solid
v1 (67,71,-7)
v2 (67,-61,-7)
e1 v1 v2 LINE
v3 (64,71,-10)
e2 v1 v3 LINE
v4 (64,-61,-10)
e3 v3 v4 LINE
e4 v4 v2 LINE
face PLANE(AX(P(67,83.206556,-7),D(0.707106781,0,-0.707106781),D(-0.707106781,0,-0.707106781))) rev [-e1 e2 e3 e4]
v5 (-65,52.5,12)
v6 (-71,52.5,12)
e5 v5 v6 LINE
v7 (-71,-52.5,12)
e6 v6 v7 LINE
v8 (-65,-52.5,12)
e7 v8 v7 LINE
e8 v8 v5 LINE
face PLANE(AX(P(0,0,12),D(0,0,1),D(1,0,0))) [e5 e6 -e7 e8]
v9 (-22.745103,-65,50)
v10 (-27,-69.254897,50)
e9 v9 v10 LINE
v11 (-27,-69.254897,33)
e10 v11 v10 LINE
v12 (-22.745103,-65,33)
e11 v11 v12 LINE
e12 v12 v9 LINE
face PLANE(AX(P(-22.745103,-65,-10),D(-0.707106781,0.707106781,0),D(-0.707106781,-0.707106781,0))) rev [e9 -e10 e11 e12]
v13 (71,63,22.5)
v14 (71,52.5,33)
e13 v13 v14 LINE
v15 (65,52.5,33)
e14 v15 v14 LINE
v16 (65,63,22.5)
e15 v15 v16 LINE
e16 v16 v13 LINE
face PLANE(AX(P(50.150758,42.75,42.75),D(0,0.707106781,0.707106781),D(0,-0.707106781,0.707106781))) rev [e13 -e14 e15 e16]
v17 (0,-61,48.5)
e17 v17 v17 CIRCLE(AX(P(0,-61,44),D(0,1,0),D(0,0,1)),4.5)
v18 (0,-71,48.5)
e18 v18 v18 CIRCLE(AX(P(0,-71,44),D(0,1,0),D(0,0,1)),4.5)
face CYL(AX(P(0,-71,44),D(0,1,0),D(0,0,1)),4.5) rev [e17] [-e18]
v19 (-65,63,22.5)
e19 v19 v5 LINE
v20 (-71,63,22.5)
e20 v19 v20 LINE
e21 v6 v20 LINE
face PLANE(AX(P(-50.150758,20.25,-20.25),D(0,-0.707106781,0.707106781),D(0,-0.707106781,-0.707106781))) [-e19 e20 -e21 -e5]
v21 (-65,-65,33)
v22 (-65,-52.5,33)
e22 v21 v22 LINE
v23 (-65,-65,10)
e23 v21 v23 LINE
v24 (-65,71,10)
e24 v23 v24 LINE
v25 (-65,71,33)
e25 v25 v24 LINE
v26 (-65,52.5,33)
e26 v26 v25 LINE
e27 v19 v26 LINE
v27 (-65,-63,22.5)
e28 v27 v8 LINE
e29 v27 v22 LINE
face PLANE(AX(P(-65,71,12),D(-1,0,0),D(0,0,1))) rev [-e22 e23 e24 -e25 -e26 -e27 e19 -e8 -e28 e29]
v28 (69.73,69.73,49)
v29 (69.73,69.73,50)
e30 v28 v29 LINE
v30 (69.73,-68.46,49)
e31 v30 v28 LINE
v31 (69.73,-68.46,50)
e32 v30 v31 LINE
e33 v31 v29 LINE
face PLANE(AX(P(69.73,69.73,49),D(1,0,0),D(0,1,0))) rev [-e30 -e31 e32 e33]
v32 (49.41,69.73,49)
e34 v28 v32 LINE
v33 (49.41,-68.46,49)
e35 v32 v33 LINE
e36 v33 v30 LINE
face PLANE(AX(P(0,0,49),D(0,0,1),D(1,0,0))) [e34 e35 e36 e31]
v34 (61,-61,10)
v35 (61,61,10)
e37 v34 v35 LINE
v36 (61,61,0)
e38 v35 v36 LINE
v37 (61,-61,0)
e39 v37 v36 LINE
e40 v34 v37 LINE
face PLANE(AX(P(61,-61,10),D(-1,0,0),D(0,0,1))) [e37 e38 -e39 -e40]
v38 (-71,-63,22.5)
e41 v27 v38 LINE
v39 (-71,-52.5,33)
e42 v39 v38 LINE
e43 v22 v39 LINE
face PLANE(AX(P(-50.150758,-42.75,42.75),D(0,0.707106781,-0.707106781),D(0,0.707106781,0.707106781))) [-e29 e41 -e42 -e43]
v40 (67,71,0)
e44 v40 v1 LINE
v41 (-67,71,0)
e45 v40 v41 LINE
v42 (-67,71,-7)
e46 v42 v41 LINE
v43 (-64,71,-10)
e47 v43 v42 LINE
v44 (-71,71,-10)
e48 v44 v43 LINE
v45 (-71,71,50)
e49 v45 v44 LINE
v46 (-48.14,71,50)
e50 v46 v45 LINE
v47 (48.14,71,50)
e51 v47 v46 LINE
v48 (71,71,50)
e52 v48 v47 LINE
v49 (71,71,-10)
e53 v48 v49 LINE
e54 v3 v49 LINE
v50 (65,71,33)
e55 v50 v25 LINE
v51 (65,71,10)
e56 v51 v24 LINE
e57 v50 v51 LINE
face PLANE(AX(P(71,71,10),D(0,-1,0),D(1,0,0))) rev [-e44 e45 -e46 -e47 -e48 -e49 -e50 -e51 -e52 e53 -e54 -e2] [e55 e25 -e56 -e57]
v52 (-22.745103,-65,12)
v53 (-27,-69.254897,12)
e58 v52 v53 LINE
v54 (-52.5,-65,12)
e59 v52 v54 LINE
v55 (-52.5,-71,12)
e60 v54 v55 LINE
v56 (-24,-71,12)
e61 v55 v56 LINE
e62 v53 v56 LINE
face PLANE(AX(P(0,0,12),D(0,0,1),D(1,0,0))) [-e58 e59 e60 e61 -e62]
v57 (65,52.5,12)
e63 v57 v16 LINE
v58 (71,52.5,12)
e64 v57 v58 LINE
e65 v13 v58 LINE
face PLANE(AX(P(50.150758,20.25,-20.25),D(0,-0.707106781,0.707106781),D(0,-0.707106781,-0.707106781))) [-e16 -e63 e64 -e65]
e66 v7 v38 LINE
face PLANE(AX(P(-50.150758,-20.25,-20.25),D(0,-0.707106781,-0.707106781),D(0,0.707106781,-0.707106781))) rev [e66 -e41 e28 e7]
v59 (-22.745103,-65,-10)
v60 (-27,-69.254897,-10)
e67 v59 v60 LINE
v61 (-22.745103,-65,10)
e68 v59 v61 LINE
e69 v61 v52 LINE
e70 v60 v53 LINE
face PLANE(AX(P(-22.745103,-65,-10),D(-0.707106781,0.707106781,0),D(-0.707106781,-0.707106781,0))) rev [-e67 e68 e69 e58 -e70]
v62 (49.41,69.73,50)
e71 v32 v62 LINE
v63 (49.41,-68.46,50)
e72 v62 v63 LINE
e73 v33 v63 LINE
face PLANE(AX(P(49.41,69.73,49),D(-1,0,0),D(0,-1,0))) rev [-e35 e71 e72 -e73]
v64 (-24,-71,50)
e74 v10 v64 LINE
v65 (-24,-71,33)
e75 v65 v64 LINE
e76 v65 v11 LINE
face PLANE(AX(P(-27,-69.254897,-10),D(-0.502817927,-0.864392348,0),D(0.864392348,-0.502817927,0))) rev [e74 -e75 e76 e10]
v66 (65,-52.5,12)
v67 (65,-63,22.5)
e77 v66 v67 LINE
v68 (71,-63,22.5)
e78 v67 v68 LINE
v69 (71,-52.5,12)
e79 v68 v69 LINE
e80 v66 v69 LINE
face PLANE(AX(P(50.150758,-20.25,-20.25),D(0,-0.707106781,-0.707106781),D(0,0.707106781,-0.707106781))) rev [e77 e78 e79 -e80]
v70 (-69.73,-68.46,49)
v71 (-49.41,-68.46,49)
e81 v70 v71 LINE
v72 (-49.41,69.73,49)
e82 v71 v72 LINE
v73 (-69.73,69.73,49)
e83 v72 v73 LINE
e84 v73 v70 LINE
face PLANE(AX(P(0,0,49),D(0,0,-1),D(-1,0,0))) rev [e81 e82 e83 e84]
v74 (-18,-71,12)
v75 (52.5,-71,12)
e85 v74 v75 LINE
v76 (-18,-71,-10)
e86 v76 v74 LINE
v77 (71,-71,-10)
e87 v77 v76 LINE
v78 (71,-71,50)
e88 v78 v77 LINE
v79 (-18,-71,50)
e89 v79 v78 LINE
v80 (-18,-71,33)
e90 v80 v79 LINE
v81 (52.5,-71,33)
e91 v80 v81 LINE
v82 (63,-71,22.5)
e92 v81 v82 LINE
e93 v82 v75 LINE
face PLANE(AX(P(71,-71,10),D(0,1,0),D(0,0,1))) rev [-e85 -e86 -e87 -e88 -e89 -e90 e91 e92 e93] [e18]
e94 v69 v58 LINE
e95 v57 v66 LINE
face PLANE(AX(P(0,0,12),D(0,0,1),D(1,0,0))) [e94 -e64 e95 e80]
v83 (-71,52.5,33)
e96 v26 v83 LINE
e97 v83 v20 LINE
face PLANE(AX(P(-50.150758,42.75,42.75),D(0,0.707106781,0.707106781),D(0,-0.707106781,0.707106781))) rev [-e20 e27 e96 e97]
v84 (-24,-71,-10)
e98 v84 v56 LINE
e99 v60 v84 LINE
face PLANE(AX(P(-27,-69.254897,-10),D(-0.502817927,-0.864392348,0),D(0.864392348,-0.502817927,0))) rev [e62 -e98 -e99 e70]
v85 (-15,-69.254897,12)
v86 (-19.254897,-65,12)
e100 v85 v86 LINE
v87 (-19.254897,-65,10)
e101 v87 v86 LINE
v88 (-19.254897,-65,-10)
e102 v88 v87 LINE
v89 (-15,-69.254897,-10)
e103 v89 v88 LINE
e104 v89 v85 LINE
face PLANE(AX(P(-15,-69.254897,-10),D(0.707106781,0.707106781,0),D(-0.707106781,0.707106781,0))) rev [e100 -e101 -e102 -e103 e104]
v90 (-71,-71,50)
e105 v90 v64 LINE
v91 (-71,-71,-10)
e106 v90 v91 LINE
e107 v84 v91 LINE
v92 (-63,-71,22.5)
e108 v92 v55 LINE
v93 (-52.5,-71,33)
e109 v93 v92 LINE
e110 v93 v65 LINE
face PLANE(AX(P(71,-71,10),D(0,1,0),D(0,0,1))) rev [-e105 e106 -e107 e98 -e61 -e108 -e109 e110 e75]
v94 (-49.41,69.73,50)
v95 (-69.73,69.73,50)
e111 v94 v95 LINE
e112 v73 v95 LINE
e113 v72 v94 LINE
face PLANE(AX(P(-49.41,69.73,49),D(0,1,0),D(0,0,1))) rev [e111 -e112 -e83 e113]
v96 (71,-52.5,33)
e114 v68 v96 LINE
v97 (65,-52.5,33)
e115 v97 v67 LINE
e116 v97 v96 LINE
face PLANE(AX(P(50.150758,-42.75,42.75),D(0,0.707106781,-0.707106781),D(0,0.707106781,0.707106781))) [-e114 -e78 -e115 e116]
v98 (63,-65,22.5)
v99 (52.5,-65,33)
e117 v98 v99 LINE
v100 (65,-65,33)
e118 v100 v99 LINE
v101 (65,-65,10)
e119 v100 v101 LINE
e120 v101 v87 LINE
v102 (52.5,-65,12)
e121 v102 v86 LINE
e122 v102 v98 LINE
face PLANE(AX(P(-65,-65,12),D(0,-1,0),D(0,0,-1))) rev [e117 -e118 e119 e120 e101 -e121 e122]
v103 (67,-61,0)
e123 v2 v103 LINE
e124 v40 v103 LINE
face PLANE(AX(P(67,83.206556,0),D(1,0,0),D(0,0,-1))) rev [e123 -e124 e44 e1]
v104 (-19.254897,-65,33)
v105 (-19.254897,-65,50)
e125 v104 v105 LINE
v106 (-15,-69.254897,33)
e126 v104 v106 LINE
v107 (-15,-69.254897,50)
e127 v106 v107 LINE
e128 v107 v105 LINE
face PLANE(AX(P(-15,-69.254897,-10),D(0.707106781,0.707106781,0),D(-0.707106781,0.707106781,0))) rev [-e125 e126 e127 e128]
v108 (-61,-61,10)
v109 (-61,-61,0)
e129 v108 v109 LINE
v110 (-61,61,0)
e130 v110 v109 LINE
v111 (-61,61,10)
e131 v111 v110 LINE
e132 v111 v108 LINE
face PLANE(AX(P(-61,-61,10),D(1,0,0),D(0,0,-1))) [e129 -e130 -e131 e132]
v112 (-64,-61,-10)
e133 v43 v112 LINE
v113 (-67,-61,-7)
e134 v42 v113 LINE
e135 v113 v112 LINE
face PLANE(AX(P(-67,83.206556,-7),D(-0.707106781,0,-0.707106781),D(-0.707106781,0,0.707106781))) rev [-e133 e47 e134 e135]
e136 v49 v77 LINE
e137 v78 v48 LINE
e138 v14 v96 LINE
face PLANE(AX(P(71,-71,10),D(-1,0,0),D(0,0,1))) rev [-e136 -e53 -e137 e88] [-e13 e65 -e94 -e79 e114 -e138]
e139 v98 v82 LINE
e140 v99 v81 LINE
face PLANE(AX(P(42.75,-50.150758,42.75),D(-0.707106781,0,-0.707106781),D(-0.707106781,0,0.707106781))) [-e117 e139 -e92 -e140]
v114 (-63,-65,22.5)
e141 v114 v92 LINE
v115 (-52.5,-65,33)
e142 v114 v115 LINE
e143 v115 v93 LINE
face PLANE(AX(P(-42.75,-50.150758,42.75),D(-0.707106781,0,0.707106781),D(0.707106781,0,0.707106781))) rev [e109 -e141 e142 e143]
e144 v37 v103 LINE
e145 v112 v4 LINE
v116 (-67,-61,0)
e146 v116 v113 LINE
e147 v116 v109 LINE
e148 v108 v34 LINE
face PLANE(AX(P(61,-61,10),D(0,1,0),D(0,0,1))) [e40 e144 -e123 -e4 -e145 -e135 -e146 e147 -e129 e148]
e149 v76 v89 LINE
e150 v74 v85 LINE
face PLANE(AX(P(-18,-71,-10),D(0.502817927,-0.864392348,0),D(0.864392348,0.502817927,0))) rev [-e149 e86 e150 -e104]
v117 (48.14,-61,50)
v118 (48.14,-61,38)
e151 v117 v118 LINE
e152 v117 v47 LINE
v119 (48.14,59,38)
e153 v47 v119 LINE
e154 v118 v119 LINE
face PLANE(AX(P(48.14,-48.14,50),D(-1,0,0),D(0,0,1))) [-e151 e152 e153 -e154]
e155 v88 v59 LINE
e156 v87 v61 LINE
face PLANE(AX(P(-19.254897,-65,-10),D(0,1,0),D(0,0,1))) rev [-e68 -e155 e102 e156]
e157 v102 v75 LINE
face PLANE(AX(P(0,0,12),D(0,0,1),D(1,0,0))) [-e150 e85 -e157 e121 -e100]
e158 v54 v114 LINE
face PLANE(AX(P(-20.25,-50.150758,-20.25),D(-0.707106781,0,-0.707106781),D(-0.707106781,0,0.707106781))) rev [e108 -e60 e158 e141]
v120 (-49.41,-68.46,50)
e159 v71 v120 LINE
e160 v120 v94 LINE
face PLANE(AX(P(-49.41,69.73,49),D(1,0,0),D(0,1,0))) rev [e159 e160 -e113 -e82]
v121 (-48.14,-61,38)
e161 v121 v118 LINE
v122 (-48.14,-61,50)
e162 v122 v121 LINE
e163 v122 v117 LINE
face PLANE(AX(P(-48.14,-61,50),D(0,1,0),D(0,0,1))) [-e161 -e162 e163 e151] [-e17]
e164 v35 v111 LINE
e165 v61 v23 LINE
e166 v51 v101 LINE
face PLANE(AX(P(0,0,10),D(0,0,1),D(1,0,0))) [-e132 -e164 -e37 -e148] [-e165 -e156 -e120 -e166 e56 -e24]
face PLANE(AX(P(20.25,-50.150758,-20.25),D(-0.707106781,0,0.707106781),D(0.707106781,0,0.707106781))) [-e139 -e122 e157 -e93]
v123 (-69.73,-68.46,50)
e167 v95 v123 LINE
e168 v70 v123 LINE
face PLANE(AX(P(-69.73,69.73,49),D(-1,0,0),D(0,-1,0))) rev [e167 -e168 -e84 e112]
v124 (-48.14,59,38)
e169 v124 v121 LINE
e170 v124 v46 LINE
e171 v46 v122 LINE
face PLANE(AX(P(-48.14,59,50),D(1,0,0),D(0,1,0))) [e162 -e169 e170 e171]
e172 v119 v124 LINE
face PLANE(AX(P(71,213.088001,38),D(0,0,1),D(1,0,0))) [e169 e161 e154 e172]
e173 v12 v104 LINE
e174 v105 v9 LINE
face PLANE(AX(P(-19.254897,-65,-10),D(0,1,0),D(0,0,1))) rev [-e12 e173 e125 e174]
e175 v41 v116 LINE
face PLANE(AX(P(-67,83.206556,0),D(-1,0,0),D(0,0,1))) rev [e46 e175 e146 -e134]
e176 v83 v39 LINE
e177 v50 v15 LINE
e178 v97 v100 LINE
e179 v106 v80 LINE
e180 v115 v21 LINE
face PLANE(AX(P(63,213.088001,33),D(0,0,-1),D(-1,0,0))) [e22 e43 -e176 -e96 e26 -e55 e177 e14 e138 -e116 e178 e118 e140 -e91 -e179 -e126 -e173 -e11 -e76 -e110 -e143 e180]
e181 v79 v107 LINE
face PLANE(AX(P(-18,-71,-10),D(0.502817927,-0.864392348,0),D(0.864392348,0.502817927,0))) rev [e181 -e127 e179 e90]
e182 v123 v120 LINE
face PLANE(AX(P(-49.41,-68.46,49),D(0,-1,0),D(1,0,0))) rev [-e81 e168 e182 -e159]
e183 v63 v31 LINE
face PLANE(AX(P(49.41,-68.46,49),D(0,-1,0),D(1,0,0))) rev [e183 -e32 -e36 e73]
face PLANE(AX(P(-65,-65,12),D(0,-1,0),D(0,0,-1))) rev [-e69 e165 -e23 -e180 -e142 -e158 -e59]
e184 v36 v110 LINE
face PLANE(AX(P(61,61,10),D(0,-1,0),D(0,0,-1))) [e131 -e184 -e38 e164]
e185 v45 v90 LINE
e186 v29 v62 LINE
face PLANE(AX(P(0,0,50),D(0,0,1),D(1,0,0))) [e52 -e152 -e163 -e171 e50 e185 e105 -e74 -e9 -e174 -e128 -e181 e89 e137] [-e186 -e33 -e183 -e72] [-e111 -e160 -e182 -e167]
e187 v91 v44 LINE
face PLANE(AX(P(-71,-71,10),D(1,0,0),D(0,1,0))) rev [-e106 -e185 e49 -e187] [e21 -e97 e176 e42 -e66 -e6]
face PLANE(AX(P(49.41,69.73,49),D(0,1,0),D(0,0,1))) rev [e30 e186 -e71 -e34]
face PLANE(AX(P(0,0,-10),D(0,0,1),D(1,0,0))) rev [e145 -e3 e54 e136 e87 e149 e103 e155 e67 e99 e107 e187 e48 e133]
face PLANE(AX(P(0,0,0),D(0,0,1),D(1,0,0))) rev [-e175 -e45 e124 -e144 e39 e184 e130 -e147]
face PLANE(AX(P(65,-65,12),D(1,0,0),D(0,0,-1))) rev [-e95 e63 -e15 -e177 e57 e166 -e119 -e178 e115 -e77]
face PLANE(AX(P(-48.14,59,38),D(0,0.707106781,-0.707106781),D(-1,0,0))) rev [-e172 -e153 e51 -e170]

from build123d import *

# Parameters (mm, degrees)
SKETCH1_W            = 142
SKETCH1_H            = 142
SKETCH1_W_2          = 122
SKETCH1_H_2          = 122
BOSS_EXTRUDE1_DEPTH  = 10
SKETCH2_W            = 142
SKETCH2_H            = 10
BOSS_EXTRUDE2_DEPTH  = 10
BOSS_EXTRUDE3_DEPTH  = 132
BOSS_EXTRUDE4_DEPTH  = 2
SKETCH6_W            = 6
SKETCH6_H            = 8
BOSS_EXTRUDE5_DEPTH  = 21
BOSS_EXTRUDE6_DEPTH  = 142
BOSS_EXTRUDE7_DEPTH  = 6
BOSS_EXTRUDE8_DEPTH  = 6
SKETCH10_W           = 142
SKETCH10_H           = 142
BOSS_EXTRUDE9_DEPTH  = 12
BOSS_EXTRUDE14_DEPTH = 6
SKETCH13_R           = 4.5
CUT_EXTRUDE2_DEPTH   = 159.003164525
SKETCH14_W           = 20.32
SKETCH14_H           = 138.19
CUT_EXTRUDE3_DEPTH   = 1
CHAMFER4_SIZE        = 12
CUT_EXTRUDE4_DEPTH   = 117.970081645


with BuildPart() as part:
    # Sketch1 → Boss-Extrude1 (new body)
    with BuildSketch(Plane(origin=(0, 0, 0), x_dir=(0, 1, 0), z_dir=(0, 0, 1))):
        Rectangle(SKETCH1_W, SKETCH1_H)
        Rectangle(SKETCH1_W_2, SKETCH1_H_2, mode=Mode.SUBTRACT)
    extrude(amount=BOSS_EXTRUDE1_DEPTH)

    # Sketch2 → Boss-Extrude2 (add)
    with BuildSketch(Plane(origin=(0, 0, 0), x_dir=(1, 0, 0), z_dir=(0, 0, -1))):
        with Locations((0, 66)):
            Rectangle(SKETCH2_W, SKETCH2_H)
    extrude(amount=BOSS_EXTRUDE2_DEPTH)

    # Sketch3 → Boss-Extrude3 (add)
    with BuildSketch(Plane(origin=(0, -61, 0), x_dir=(-1, 0, 0), z_dir=(0, 1, 0))):
        Polygon((-67, -7), (-64, -10), (-71, -10), (-71, 0), (-67, 0), align=None)
        Polygon((64, -10), (71, -10), (71, 0), (67, 0), (67, -7), align=None)
    extrude(amount=BOSS_EXTRUDE3_DEPTH)

    # Sketch5 → Boss-Extrude4 (add)
    with BuildSketch(Plane.XY.offset(10)):
        Polygon((-65, -65), (65, -65), (65, 65), (65, 71), (71, 71), (71, 65), (71, -71), (-71, -71), (-71, 71), (-65, 71), (-65, 65), align=None)
    extrude(amount=BOSS_EXTRUDE4_DEPTH)

    # Sketch6 → Boss-Extrude5 (add)
    with BuildSketch(Plane.XY.offset(12)):
        with Locations((-68, 67)):
            Rectangle(SKETCH6_W, SKETCH6_H)
        Polygon((-65, -65), (-65, -63), (-71, -63), (-71, -71), (-63, -71), (-63, -65), align=None)
        Polygon((63, -71), (63, -65), (65, -65), (65, -63), (71, -63), (71, -71), align=None)
        with Locations((68, 67)):
            Rectangle(SKETCH6_W, SKETCH6_H)
    extrude(amount=BOSS_EXTRUDE5_DEPTH)

    # Sketch7 → Boss-Extrude6 (add)
    with BuildSketch(Plane.XZ.offset(71)):
        Polygon((-63, 33), (63, 33), (71, 33), (71, 38), (-71, 38), (-71, 33), align=None)
    extrude(amount=-BOSS_EXTRUDE6_DEPTH)

    # Sketch8 → Boss-Extrude7 (add)
    with BuildSketch(Plane.YZ.offset(71)):
        Polygon((63, 12), (63, 22.5), (52.5, 12), align=None)
        Polygon((52.5, 33), (63, 22.5), (63, 33), align=None)
    boss_extrude7 = extrude(amount=-BOSS_EXTRUDE7_DEPTH)

    # Sketch9 → Boss-Extrude8 (add)
    with BuildSketch(Plane(origin=(-71, 0, 0), x_dir=(0, -1, 0), z_dir=(-1, 0, 0))):
        Polygon((-52.5, 12), (-63, 22.5), (-63, 12), align=None)
        Polygon((-52.5, 33), (-63, 33), (-63, 22.5), align=None)
    boss_extrude8 = extrude(amount=-BOSS_EXTRUDE8_DEPTH)

    # Mirror4: Boss-Extrude7, Boss-Extrude8 across plane
    add(boss_extrude7.mirror(Plane.ZX))
    add(boss_extrude8.mirror(Plane.ZX))

    # Sketch10 → Boss-Extrude9 (add)
    with BuildSketch(Plane.XY.offset(38)):
        Rectangle(SKETCH10_W, SKETCH10_H)
        Polygon((-48.14, 59), (-48.14, -48.14), (-48.14, -61), (48.14, -61), (48.14, -48.14), (48.14, 59), align=None, mode=Mode.SUBTRACT)
    extrude(amount=BOSS_EXTRUDE9_DEPTH)

    # Sketch11 → Boss-Extrude14 (add)
    with BuildSketch(Plane.XZ.offset(71)):
        Polygon((-52.5, 12), (-63, 22.5), (-63, 12), align=None)
        Polygon((-63, 33), (-63, 22.5), (-52.5, 33), align=None)
    boss_extrude14 = extrude(amount=-BOSS_EXTRUDE14_DEPTH)

    # Mirror5: Boss-Extrude14 across plane
    add(boss_extrude14.mirror(Plane(origin=(0, 0, 0), x_dir=(0, 0, 1), z_dir=(1, 0, 0))))

    # Sketch13 → Cut-Extrude2 (cut, through all)
    with BuildSketch(Plane(origin=(0, -61, 0), x_dir=(-1, 0, 0), z_dir=(0, 1, 0))):
        with Locations(Location((0, 44, 0), (0, 0, 90))):
            Circle(SKETCH13_R)
    extrude(amount=-CUT_EXTRUDE2_DEPTH, mode=Mode.SUBTRACT)

    # Sketch14 → Cut-Extrude3 (cut)
    with BuildSketch(Plane.XY.offset(50)):
        with Locations((-59.57, 0.635)):
            Rectangle(SKETCH14_W, SKETCH14_H)
        with Locations((59.57, 0.635)):
            Rectangle(SKETCH14_W, SKETCH14_H)
    extrude(amount=-CUT_EXTRUDE3_DEPTH, mode=Mode.SUBTRACT)

    # Chamfer4
    chamfer4_edges = [part.edges().sort_by_distance(p)[0] for p in [
        (0, 59, 50),
    ]]
    chamfer(chamfer4_edges, length=CHAMFER4_SIZE - 0.0001)  # a hair under: the kernel refuses the full size

    # Sketch15 → Cut-Extrude4 (cut, through all)
    with BuildSketch(Plane.XY.offset(50)):
        Polygon((-24, -71), (-18, -71), (-15, -69.254896882), (-19.254896882, -65), (-22.745103118, -65), (-27, -69.254896882), align=None)
    extrude(amount=-CUT_EXTRUDE4_DEPTH, mode=Mode.SUBTRACT)


solid = part.part
